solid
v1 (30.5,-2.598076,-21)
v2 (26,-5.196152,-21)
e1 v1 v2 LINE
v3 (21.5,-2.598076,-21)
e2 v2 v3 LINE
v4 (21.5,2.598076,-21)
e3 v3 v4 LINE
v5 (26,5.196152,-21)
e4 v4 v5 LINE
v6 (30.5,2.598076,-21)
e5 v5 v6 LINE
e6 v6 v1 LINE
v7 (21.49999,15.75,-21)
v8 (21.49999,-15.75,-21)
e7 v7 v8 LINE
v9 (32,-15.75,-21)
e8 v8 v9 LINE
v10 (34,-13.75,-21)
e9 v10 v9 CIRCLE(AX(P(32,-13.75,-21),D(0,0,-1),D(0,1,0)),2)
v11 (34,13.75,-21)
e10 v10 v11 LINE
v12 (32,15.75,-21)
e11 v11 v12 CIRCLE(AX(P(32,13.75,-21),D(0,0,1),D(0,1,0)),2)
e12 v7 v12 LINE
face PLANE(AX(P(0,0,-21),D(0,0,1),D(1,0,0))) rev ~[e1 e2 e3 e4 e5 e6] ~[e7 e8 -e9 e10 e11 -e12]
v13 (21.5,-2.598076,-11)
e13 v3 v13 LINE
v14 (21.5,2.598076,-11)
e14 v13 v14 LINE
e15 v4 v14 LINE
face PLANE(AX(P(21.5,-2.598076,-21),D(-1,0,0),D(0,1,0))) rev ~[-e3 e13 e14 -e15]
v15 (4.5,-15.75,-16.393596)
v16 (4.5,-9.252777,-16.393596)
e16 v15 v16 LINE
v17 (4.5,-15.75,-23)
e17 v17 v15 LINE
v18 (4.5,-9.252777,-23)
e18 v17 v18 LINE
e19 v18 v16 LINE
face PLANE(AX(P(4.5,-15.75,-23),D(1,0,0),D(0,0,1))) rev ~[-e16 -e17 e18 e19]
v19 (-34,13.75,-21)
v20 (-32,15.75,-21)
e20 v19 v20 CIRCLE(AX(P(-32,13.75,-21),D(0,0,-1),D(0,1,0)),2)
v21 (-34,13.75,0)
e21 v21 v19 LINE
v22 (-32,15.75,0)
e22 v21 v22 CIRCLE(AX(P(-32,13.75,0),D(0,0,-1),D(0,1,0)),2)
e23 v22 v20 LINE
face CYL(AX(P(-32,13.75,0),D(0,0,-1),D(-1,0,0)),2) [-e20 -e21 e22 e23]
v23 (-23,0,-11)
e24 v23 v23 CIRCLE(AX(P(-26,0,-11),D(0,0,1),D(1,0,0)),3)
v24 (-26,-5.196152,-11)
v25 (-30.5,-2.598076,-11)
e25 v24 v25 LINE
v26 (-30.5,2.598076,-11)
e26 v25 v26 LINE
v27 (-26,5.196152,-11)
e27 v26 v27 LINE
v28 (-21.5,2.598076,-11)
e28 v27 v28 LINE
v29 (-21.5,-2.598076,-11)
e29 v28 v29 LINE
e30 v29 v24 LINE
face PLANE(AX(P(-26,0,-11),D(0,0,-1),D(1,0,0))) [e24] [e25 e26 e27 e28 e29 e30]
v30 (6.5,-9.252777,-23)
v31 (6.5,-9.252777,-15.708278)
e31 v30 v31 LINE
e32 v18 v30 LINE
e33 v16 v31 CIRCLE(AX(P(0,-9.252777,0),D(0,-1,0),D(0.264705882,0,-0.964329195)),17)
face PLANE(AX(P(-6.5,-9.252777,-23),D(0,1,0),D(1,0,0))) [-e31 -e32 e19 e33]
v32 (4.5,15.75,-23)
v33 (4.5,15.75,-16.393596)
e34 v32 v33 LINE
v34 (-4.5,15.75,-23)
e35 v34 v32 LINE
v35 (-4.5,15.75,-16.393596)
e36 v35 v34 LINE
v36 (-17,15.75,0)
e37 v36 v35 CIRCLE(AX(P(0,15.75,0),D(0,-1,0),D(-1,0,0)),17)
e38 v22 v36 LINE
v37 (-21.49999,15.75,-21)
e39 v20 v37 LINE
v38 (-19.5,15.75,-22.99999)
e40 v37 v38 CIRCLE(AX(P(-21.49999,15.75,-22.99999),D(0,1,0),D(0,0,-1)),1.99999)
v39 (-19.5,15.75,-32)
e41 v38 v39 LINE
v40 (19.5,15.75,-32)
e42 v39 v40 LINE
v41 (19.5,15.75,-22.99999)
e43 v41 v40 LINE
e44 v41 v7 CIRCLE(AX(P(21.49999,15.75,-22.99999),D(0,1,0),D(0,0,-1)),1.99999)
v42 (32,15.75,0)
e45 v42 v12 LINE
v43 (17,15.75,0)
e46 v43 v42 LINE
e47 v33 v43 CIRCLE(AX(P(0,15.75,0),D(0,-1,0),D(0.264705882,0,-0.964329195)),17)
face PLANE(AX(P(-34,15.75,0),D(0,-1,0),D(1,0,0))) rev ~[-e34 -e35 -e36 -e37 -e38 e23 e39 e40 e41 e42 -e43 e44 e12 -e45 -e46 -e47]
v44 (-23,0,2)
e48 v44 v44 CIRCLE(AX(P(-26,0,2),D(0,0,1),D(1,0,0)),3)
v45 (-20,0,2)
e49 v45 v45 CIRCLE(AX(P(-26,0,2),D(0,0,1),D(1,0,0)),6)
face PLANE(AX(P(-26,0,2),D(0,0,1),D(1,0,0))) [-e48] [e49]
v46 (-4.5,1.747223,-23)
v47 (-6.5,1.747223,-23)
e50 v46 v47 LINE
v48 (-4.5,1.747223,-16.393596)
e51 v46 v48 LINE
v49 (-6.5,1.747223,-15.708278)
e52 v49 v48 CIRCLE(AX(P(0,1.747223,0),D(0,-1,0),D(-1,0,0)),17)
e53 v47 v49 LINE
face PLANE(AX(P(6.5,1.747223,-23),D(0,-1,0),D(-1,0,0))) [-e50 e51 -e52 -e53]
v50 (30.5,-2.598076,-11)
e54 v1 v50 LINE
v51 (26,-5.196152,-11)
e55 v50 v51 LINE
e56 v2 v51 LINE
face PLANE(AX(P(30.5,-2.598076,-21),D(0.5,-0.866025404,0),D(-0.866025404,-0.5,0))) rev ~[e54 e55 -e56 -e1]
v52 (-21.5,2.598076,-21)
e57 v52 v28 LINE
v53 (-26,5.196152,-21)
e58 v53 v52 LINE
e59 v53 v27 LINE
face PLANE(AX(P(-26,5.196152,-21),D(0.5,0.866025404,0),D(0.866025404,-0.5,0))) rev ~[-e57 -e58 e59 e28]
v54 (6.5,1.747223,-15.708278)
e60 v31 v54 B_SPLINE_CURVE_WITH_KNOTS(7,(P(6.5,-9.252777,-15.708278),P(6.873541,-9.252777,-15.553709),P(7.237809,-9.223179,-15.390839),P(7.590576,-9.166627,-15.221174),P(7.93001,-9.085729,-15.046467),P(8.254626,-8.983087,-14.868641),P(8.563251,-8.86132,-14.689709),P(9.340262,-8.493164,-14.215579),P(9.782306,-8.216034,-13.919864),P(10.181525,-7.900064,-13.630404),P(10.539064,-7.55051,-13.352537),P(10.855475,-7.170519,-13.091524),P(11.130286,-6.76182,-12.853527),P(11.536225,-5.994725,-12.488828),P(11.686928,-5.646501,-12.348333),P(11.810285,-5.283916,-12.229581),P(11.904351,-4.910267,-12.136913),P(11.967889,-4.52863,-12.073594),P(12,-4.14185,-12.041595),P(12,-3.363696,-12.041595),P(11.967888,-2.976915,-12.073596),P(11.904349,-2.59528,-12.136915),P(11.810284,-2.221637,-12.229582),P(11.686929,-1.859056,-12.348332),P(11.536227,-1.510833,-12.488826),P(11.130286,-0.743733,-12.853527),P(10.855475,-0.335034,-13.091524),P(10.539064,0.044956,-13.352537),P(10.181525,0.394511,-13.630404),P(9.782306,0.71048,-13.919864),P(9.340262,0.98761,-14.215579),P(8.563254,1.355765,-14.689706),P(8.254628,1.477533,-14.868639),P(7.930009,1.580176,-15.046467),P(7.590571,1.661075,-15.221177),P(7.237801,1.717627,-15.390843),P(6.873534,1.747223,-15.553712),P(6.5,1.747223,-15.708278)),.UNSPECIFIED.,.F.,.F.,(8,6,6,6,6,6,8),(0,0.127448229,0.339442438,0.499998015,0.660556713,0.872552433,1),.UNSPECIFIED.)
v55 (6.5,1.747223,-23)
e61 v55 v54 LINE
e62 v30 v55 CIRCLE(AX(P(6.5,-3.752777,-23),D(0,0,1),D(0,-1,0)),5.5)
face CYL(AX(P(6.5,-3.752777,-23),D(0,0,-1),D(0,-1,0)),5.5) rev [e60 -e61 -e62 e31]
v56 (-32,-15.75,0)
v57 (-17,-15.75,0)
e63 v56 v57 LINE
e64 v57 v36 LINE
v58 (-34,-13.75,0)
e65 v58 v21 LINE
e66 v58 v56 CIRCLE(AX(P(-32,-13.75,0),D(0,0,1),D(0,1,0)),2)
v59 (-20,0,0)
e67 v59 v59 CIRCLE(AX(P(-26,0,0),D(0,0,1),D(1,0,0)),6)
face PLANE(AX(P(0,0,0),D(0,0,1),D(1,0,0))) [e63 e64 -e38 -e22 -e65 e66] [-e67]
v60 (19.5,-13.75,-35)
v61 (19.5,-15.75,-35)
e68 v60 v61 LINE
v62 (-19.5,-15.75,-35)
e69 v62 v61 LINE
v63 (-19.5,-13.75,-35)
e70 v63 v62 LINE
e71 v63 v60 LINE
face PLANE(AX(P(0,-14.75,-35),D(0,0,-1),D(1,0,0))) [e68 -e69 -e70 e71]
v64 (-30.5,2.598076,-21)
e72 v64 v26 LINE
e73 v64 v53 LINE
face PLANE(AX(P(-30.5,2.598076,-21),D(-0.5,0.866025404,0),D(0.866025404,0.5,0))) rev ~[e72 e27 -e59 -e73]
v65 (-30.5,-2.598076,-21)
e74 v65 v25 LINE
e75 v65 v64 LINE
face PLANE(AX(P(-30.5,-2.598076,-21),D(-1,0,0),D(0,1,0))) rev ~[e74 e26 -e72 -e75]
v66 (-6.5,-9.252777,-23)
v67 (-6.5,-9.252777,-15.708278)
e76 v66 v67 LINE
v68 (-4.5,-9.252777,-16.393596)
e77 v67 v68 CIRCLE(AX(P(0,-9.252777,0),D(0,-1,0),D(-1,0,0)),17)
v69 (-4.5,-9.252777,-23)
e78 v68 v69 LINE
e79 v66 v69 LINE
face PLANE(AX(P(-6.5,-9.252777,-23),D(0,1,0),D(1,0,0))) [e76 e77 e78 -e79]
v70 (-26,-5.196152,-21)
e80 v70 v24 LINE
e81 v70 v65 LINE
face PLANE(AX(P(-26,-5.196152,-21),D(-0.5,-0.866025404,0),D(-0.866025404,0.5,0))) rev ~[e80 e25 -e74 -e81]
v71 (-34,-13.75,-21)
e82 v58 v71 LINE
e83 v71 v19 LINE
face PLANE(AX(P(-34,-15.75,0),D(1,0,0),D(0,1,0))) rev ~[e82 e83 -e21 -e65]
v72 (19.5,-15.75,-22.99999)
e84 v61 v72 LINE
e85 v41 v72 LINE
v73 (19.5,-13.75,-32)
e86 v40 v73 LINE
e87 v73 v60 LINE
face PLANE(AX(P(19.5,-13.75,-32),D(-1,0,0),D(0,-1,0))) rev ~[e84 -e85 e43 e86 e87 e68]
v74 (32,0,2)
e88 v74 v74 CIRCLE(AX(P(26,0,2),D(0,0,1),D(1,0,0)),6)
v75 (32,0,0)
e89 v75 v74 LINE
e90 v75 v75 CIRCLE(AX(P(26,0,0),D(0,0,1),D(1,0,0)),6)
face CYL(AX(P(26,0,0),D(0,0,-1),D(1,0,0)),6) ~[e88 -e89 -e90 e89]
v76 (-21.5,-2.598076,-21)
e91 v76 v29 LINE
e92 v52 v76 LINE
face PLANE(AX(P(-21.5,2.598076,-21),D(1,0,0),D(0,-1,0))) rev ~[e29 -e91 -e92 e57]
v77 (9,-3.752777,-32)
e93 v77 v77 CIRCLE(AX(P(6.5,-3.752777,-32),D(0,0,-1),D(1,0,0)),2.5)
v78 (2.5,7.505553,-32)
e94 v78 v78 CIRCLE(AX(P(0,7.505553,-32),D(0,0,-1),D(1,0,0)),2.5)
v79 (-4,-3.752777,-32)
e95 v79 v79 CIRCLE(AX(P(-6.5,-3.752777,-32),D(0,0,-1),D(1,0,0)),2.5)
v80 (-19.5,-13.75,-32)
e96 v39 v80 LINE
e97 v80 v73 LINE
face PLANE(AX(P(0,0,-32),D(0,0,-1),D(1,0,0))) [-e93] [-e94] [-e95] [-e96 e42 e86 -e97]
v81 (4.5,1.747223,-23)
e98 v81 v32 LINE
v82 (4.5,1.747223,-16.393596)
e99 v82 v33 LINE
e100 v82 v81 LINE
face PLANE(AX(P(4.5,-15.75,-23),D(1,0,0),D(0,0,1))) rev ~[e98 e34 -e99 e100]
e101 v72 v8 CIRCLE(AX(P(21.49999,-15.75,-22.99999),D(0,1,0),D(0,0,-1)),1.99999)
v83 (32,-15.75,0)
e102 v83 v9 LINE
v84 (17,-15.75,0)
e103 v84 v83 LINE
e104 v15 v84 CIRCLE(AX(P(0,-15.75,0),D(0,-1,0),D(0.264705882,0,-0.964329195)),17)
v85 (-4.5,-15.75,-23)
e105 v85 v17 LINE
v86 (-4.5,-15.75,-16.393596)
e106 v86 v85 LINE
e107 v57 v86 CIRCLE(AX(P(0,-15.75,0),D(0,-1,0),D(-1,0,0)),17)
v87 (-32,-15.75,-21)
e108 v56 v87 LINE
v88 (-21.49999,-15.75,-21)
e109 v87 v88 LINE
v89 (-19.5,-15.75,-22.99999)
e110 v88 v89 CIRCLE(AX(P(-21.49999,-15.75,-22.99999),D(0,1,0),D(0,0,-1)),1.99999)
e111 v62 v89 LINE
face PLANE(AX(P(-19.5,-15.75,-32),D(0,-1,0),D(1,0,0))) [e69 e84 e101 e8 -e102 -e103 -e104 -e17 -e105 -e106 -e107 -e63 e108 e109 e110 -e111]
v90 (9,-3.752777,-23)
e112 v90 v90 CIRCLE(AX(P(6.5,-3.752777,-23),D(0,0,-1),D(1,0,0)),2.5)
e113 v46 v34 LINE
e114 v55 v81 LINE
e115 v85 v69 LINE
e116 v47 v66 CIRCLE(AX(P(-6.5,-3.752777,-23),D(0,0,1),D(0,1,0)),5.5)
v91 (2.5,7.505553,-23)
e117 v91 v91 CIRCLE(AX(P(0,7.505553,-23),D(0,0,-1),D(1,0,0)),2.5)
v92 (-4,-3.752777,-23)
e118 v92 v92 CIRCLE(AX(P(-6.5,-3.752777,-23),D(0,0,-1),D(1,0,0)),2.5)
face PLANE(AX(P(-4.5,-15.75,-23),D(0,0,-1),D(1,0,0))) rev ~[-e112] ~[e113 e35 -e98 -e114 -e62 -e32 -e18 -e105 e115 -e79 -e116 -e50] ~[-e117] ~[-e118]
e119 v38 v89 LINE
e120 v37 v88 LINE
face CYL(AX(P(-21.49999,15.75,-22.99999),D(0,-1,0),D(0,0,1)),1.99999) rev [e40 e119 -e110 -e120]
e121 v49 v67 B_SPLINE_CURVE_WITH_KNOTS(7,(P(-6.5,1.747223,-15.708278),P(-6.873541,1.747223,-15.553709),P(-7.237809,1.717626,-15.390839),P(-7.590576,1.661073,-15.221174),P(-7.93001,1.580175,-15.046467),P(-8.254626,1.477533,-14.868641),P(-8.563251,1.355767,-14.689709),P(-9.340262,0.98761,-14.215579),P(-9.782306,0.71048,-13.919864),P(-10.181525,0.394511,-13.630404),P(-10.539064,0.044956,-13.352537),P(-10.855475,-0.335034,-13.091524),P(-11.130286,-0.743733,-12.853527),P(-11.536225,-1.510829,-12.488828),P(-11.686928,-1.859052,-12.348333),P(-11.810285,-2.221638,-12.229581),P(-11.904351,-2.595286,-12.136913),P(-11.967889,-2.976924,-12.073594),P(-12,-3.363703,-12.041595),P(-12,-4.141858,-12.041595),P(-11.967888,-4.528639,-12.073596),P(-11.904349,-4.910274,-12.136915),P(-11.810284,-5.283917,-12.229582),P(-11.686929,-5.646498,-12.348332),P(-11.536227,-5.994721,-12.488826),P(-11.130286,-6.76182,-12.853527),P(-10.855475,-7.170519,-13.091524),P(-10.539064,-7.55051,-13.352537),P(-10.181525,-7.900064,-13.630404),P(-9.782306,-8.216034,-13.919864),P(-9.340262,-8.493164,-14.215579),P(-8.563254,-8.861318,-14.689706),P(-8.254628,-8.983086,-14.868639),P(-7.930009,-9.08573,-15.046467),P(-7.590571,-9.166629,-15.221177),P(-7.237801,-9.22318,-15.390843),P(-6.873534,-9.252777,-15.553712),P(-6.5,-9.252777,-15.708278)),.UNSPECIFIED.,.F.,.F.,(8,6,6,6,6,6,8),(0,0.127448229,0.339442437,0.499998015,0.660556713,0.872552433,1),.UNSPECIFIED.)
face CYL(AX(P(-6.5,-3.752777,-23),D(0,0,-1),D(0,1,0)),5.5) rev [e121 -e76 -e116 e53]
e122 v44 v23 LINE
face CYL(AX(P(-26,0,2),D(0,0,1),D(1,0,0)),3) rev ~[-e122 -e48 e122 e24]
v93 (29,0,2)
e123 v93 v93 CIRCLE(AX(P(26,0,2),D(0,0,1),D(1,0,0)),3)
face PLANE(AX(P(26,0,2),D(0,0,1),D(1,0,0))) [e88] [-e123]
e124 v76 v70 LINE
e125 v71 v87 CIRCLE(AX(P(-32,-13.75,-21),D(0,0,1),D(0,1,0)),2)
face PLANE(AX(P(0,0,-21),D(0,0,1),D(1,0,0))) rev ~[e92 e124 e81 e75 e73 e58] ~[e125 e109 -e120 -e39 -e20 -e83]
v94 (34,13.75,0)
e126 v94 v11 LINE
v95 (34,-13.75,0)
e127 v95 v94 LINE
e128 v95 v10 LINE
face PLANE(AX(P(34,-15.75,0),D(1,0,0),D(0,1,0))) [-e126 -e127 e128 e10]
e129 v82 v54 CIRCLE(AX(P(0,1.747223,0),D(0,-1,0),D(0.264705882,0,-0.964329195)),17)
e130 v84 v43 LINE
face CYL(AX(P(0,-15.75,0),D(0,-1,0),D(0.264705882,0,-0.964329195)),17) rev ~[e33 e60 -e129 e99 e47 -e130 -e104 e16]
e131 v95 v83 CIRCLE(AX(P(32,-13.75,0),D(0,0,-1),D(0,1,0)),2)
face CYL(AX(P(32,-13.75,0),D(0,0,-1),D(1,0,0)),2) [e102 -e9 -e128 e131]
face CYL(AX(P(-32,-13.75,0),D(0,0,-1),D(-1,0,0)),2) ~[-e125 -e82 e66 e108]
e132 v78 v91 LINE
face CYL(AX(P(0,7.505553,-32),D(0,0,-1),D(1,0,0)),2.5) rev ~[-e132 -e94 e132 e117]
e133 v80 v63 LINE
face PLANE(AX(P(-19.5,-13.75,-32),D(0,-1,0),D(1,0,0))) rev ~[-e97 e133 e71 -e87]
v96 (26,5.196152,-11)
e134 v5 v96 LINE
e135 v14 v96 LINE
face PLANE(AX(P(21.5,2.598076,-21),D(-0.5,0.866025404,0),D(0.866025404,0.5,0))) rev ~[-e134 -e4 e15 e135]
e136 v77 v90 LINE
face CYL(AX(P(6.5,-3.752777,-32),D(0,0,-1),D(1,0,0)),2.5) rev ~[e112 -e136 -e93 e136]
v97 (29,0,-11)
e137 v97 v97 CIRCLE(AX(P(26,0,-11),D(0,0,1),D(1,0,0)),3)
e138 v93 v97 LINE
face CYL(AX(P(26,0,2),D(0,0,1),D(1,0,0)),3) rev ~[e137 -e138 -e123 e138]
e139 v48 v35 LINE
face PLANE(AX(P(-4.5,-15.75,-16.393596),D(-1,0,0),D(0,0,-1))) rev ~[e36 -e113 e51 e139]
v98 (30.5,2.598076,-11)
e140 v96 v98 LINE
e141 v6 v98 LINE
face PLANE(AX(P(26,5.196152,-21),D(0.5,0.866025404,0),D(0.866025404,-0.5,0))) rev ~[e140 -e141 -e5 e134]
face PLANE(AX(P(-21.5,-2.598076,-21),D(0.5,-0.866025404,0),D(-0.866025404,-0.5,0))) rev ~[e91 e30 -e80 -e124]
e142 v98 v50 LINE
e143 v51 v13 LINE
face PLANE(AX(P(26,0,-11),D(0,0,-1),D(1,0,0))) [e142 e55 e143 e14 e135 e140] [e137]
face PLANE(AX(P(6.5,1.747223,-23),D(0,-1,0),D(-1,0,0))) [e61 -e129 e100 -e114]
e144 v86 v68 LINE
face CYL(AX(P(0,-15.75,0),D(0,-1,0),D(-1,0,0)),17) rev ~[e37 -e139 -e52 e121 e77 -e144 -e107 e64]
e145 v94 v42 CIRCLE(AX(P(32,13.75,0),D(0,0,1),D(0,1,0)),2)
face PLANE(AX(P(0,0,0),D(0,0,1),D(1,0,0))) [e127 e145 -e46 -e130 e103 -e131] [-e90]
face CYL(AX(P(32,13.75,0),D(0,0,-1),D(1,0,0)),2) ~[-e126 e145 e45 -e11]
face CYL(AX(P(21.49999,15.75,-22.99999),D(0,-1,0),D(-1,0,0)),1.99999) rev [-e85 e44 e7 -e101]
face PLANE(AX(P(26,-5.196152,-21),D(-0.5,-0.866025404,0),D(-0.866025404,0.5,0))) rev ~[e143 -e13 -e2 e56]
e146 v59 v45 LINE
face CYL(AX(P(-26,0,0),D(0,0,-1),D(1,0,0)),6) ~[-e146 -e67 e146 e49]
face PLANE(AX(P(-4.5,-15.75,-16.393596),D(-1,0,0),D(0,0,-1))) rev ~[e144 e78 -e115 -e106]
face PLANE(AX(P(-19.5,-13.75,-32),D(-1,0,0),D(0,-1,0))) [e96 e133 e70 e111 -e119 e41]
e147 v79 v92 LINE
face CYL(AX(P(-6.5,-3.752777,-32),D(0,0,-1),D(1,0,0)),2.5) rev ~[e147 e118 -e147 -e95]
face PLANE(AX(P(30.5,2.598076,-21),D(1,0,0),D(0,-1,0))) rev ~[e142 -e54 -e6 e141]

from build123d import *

# Parameters (mm, degrees)
F0_W      = 68
F0_H      = 31.5
F1_DEPTH  = 21
F2_W      = 39
F2_H      = 31.5
F3_DEPTH  = 11
F4_R      = 6
F5_DEPTH  = 2
F6_R      = 3
F7_DEPTH  = 34.001
F9_DEPTH  = 10
F11_DEPTH = 31.501
F12_W     = 39
F12_H     = 2
F13_DEPTH = 3
F14_R     = 2.5
F15_DEPTH = 34.001
F17_DEPTH = 25.001
F18_R     = 2
F19_R     = 1.99999


# Not quite as in the source:
# - a fillet or chamfer is up to 0.001 mm smaller than in the source, because OpenCascade refuses the exact size


with BuildPart() as f1:
    # F0 (on Top) → F1 (new body)
    with BuildSketch(Plane.XY):
        Rectangle(F0_W, F0_H)
    extrude(amount=-F1_DEPTH)

    # F2 (on face) → F3 (join)
    with BuildSketch(Plane(origin=(0, 0, -21), x_dir=(1, 0, 0), z_dir=(0, 0, -1))):
        Rectangle(F2_W, F2_H)
    extrude(amount=F3_DEPTH)

    # F4 (on face) → F5 (join)
    with BuildSketch(Plane.XY):
        with Locations((-26, 0)):
            Circle(F4_R)
        with Locations((26, 0)):
            Circle(F4_R)
    extrude(amount=F5_DEPTH)

    # F6 (on face) → F7 (cut, through all)
    with BuildSketch(Plane.XY.offset(2)):
        with Locations((-26, 0)):
            Circle(F6_R)
        with Locations((26, 0)):
            Circle(F6_R)
    extrude(amount=-F7_DEPTH, mode=Mode.SUBTRACT)

    # F8 (on face) → F9 (cut)
    with BuildSketch(Plane(origin=(0, 0, -21), x_dir=(1, 0, 0), z_dir=(0, 0, -1))):
        Polygon((-26, 5.1961524227), (-30.5, 2.5980762114), (-30.5, -2.5980762114), (-26, -5.1961524227), (-21.5, -2.5980762114), (-21.5, 2.5980762114), align=None)
        Polygon((26, -5.1961524227), (30.5, -2.5980762114), (30.5, 2.5980762114), (26, 5.1961524227), (21.5, 2.5980762114), (21.5, -2.5980762114), align=None)
    extrude(amount=-F9_DEPTH, mode=Mode.SUBTRACT)

    # F10 (on face) → F11 (cut, through all)
    with BuildSketch(Plane.XZ.offset(15.75)):
        with BuildLine():
            Line((4.5, -23), (4.5, -16.3935963108))
            ThreePointArc((4.5, -16.3935963108), (13.5185058346, -10.307764064), (17, 0))
            Line((17, 0), (-17, 0))
            ThreePointArc((-17, 0), (-13.5185058346, -10.307764064), (-4.5, -16.3935963108))
            Line((-4.5, -16.3935963108), (-4.5, -23))
            Line((-4.5, -23), (4.5, -23))
        make_face()
    extrude(amount=-F11_DEPTH, mode=Mode.SUBTRACT)

    # F12 (on face) → F13 (join)
    with BuildSketch(Plane(origin=(0, 0, -32), x_dir=(1, 0, 0), z_dir=(0, 0, -1))):
        with Locations((0, 14.75)):
            Rectangle(F12_W, F12_H)
    extrude(amount=F13_DEPTH)

    # F14 (on face) → F15 (cut, through all)
    with BuildSketch(Plane(origin=(0, 0, -32), x_dir=(1, 0, 0), z_dir=(0, 0, -1))):
        with Locations((-6.5, 3.7527767497)):
            Circle(F14_R)
        with Locations((6.5, 3.7527767497)):
            Circle(F14_R)
        with Locations((0, -7.5055534995)):
            Circle(F14_R)
    extrude(amount=-F15_DEPTH, mode=Mode.SUBTRACT)

    # F16 (on face) → F17 (cut, through all)
    with BuildSketch(Plane.XY.offset(-23)):
        with BuildLine():
            ThreePointArc((-6.5, 1.7472232503), (-12, -3.7527767497), (-6.5, -9.2527767497))
            Line((-6.5, -9.2527767497), (6.5, -9.2527767497))
            ThreePointArc((6.5, -9.2527767497), (12, -3.7527767497), (6.5, 1.7472232503))
            Line((6.5, 1.7472232503), (-6.5, 1.7472232503))
        make_face()
    extrude(amount=F17_DEPTH, mode=Mode.SUBTRACT)

    # F18
    f18_edges = [f1.edges().sort_by_distance(p)[0] for p in [
        (-34, -15.75, -10.5),
        (34, -15.75, -10.5),
        (34, 15.75, -10.5),
        (-34, 15.75, -10.5),
    ]]
    fillet(f18_edges, radius=F18_R)

    # F19 (radius 2 in the source; OpenCascade refuses exactly that, so slightly less here)
    f19_edges = [f1.edges().sort_by_distance(p)[0] for p in [
        (-19.5, 0, -21),
        (19.5, 0, -21),
    ]]
    fillet(f19_edges, radius=F19_R)


solid = f1.part
